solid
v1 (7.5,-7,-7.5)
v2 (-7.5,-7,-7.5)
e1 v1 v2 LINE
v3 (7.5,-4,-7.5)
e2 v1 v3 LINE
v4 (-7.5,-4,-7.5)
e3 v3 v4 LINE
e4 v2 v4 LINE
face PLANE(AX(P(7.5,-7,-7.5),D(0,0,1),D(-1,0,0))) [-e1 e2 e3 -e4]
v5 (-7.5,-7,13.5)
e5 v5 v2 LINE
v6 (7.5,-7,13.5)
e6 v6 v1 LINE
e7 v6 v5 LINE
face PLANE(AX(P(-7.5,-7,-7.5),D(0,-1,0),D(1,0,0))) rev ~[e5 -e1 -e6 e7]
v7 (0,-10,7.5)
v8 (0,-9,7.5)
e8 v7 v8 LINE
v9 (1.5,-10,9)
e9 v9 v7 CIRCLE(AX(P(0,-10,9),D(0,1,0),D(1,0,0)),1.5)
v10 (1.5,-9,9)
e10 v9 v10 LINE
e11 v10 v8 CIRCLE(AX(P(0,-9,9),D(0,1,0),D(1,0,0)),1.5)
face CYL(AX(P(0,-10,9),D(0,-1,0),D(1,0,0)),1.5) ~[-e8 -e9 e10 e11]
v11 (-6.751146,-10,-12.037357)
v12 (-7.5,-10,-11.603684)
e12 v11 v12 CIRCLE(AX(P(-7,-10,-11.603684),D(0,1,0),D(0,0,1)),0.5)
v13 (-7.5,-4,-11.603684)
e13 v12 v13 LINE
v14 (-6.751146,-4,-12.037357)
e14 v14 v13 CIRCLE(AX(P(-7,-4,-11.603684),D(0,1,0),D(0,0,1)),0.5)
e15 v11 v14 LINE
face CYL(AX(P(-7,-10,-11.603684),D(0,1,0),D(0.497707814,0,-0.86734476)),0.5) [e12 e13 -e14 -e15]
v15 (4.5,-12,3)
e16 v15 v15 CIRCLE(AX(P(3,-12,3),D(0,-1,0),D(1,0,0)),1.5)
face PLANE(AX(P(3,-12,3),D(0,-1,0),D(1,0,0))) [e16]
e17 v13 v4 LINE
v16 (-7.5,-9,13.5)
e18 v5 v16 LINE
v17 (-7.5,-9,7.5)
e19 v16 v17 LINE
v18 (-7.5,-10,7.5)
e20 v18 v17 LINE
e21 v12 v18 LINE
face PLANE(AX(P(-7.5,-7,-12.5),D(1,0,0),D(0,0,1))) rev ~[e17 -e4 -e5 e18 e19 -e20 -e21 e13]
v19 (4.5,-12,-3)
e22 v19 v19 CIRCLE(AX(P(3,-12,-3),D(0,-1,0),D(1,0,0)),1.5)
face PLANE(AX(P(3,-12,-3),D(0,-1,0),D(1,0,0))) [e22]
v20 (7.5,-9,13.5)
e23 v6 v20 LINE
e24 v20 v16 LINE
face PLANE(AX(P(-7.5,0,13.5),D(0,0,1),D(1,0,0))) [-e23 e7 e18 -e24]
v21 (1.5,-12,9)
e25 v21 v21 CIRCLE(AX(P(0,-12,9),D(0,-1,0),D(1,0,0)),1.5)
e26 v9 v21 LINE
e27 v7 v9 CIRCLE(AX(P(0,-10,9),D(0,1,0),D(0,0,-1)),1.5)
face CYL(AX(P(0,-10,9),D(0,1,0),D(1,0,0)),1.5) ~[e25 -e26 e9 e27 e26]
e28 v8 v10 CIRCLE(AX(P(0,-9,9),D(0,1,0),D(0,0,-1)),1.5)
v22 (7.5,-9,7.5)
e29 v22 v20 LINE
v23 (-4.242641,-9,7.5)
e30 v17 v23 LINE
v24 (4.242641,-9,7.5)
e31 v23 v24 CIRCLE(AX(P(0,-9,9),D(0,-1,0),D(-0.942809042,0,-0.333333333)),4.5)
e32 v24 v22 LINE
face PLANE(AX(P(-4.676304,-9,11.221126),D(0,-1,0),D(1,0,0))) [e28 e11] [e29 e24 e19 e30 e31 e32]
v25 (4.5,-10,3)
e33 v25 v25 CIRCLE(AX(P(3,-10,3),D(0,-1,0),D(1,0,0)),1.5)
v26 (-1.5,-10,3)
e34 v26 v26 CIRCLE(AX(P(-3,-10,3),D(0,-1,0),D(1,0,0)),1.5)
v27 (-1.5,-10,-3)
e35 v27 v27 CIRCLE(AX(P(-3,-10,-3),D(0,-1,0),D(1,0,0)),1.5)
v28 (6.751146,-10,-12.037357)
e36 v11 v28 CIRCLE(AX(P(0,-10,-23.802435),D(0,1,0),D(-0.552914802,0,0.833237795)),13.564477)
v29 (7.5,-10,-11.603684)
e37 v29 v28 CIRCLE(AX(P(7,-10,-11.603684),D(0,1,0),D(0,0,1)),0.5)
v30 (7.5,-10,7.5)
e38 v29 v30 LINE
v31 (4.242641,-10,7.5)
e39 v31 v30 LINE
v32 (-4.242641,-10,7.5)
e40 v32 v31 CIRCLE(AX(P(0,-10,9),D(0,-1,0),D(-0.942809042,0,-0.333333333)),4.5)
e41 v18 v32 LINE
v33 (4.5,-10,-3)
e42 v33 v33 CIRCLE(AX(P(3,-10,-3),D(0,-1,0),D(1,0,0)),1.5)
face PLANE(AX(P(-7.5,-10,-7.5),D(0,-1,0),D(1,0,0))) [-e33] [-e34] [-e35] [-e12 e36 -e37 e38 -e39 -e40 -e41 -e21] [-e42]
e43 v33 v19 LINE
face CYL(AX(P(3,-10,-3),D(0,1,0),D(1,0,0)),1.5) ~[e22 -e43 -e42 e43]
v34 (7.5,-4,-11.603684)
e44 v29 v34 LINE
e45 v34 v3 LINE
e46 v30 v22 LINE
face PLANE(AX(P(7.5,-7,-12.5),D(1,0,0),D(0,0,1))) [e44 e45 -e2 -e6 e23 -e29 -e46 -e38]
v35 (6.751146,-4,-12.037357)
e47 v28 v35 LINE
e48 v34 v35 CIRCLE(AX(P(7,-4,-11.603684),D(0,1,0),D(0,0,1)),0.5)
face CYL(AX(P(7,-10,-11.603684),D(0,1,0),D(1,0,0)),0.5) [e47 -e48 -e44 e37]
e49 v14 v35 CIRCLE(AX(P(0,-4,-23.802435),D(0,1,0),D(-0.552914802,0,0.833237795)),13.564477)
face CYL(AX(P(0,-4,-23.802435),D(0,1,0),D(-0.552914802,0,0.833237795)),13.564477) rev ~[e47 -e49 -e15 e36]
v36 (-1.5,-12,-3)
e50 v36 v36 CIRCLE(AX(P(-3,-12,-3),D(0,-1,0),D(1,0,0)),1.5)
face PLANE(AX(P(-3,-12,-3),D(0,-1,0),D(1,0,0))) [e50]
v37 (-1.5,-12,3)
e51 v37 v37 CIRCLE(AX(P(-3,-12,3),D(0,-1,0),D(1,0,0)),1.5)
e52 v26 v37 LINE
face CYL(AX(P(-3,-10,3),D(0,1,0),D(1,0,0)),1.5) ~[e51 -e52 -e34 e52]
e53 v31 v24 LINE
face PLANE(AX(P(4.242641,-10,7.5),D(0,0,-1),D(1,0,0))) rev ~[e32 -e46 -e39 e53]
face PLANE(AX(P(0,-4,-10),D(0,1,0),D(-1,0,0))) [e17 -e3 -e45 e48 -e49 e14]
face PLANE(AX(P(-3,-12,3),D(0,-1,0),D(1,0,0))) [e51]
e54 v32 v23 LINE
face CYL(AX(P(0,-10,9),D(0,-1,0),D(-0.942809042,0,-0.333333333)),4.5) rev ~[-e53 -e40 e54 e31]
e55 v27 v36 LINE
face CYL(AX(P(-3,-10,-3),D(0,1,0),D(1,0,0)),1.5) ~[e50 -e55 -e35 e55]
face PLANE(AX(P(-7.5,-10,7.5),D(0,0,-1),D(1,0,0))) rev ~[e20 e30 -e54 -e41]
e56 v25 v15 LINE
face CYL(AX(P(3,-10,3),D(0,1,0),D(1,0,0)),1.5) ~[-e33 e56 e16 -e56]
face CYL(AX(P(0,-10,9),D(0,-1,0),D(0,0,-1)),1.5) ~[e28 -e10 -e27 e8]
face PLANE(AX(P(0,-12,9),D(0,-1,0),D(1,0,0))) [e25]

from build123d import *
from build123d import SkipClean  # not in build123d's __all__

# Parameters (mm, degrees)
F0_W      = 15
F0_H      = 15
F0_H_2    = 6
F1_DEPTH  = 10
F2_R      = 1.5
F3_DEPTH  = 2
F5_DEPTH  = 1
F6_R      = 1.5
F7_DEPTH  = 2
F8_W      = 15
F8_H      = 21
F9_DEPTH  = 7
F10_W     = 15
F10_H     = 3
F11_DEPTH = 5
F12_W     = 15
F12_H     = 5
F13_DEPTH = 3
F15_DEPTH = 25
F16_R     = 0.5


# Not quite as in the source:
# - after a boolean that leaves OpenCascade's solid faulty, fix() repairs it


with BuildPart() as f1:
    # F0 (on Front) → F1 (new body)
    with BuildSketch(Plane.XZ):
        Rectangle(F0_W, F0_H)
        with Locations((0, 10.5)):
            Rectangle(F0_W, F0_H_2)
    extrude(amount=F1_DEPTH)

    # F2 (on face) → F3 (join)
    with BuildSketch(Plane.XZ.offset(10)):
        with Locations((-3, 3)):
            Circle(F2_R)
        with Locations((-3, -3)):
            Circle(F2_R)
        with Locations((3, -3)):
            Circle(F2_R)
        with Locations((3, 3)):
            Circle(F2_R)
    extrude(amount=F3_DEPTH)

    # F4 (on face) → F5 (cut)
    with BuildSketch(Plane.XZ.offset(10)):
        with BuildLine():
            Line((-7.5, 13.5), (-7.5, 7.5))
            Line((-7.5, 7.5), (-4.2426406871, 7.5))
            ThreePointArc((-4.2426406871, 7.5), (-3.6742346142, 11.5980762114), (0, 13.5))
            Line((0, 13.5), (-7.5, 13.5))
        make_face()
        with BuildLine():
            ThreePointArc((0, 13.5), (-3.6742346142, 11.5980762114), (-4.2426406871, 7.5))
            Line((-4.2426406871, 7.5), (0, 7.5))
            Line((0, 7.5), (4.2426406871, 7.5))
            ThreePointArc((4.2426406871, 7.5), (4.4351935184, 8.2390410957), (4.5, 9))
            ThreePointArc((4.5, 9), (3.1819805153, 12.1819805153), (0, 13.5))
        make_face()
        with BuildLine():
            ThreePointArc((1.5, 9), (1.0606601718, 7.9393398282), (0, 7.5))
            ThreePointArc((0, 7.5), (-1.0606601718, 10.0606601718), (1.5, 9))
        make_face(mode=Mode.SUBTRACT)
        with BuildLine():
            Line((0, 7.5), (-4.2426406871, 7.5))
            ThreePointArc((-4.2426406871, 7.5), (0, 4.5), (4.2426406871, 7.5))
            Line((4.2426406871, 7.5), (0, 7.5))
        make_face()
        with BuildLine():
            Line((7.5, 13.5), (0, 13.5))
            ThreePointArc((0, 13.5), (3.1819805153, 12.1819805153), (4.5, 9))
            ThreePointArc((4.5, 9), (4.4351935184, 8.2390410957), (4.2426406871, 7.5))
            Line((4.2426406871, 7.5), (7.5, 7.5))
            Line((7.5, 7.5), (7.5, 13.5))
        make_face()
    extrude(amount=-F5_DEPTH, mode=Mode.SUBTRACT)

    # F6 (on face) → F7 (join)
    with BuildSketch(Plane.XZ.offset(10)):
        with Locations((0, 9)):
            Circle(F6_R)
    with SkipClean():  # cleaning this boolean's faces spoils the solid; the shape is the same uncleaned
        extrude(amount=F7_DEPTH)

    # F8 (on face) → F9 (cut)
    with BuildSketch(Plane(origin=(0, 0, 0), x_dir=(-1, 0, 0), z_dir=(0, 1, 0))):
        with Locations((0, 3)):
            Rectangle(F8_W, F8_H)
    extrude(amount=-F9_DEPTH, mode=Mode.SUBTRACT)

    add(f1.part.fix(), mode=Mode.REPLACE)

    # F10 (on face) → F11 (join)
    with BuildSketch(Plane(origin=(0, 0, -7.5), x_dir=(1, 0, 0), z_dir=(0, 0, -1))):
        with Locations((0, 8.5)):
            Rectangle(F10_W, F10_H)
    extrude(amount=F11_DEPTH)

    # F12 (on face) → F13 (join)
    with BuildSketch(Plane(origin=(0, -7, 0), x_dir=(-1, 0, 0), z_dir=(0, 1, 0))):
        with Locations((0, -10)):
            Rectangle(F12_W, F12_H)
    extrude(amount=F13_DEPTH)

    # F14 (on face) → F15 (cut)
    with BuildSketch(Plane(origin=(0, -4, 0), x_dir=(-1, 0, 0), z_dir=(0, 1, 0))):
        with BuildLine():
            Line((-7.5, -12.5), (7.5, -12.5))
            ThreePointArc((7.5, -12.5), (0, -10.237957932), (-7.5, -12.5))
        make_face()
    extrude(amount=-F15_DEPTH, mode=Mode.SUBTRACT)

    # F16
    f16_edges = [f1.edges().sort_by_distance(p)[0] for p in [
        (-7.5, -7, -12.5),
        (7.5, -7, -12.5),
    ]]
    fillet(f16_edges, radius=F16_R)


solid = f1.part
